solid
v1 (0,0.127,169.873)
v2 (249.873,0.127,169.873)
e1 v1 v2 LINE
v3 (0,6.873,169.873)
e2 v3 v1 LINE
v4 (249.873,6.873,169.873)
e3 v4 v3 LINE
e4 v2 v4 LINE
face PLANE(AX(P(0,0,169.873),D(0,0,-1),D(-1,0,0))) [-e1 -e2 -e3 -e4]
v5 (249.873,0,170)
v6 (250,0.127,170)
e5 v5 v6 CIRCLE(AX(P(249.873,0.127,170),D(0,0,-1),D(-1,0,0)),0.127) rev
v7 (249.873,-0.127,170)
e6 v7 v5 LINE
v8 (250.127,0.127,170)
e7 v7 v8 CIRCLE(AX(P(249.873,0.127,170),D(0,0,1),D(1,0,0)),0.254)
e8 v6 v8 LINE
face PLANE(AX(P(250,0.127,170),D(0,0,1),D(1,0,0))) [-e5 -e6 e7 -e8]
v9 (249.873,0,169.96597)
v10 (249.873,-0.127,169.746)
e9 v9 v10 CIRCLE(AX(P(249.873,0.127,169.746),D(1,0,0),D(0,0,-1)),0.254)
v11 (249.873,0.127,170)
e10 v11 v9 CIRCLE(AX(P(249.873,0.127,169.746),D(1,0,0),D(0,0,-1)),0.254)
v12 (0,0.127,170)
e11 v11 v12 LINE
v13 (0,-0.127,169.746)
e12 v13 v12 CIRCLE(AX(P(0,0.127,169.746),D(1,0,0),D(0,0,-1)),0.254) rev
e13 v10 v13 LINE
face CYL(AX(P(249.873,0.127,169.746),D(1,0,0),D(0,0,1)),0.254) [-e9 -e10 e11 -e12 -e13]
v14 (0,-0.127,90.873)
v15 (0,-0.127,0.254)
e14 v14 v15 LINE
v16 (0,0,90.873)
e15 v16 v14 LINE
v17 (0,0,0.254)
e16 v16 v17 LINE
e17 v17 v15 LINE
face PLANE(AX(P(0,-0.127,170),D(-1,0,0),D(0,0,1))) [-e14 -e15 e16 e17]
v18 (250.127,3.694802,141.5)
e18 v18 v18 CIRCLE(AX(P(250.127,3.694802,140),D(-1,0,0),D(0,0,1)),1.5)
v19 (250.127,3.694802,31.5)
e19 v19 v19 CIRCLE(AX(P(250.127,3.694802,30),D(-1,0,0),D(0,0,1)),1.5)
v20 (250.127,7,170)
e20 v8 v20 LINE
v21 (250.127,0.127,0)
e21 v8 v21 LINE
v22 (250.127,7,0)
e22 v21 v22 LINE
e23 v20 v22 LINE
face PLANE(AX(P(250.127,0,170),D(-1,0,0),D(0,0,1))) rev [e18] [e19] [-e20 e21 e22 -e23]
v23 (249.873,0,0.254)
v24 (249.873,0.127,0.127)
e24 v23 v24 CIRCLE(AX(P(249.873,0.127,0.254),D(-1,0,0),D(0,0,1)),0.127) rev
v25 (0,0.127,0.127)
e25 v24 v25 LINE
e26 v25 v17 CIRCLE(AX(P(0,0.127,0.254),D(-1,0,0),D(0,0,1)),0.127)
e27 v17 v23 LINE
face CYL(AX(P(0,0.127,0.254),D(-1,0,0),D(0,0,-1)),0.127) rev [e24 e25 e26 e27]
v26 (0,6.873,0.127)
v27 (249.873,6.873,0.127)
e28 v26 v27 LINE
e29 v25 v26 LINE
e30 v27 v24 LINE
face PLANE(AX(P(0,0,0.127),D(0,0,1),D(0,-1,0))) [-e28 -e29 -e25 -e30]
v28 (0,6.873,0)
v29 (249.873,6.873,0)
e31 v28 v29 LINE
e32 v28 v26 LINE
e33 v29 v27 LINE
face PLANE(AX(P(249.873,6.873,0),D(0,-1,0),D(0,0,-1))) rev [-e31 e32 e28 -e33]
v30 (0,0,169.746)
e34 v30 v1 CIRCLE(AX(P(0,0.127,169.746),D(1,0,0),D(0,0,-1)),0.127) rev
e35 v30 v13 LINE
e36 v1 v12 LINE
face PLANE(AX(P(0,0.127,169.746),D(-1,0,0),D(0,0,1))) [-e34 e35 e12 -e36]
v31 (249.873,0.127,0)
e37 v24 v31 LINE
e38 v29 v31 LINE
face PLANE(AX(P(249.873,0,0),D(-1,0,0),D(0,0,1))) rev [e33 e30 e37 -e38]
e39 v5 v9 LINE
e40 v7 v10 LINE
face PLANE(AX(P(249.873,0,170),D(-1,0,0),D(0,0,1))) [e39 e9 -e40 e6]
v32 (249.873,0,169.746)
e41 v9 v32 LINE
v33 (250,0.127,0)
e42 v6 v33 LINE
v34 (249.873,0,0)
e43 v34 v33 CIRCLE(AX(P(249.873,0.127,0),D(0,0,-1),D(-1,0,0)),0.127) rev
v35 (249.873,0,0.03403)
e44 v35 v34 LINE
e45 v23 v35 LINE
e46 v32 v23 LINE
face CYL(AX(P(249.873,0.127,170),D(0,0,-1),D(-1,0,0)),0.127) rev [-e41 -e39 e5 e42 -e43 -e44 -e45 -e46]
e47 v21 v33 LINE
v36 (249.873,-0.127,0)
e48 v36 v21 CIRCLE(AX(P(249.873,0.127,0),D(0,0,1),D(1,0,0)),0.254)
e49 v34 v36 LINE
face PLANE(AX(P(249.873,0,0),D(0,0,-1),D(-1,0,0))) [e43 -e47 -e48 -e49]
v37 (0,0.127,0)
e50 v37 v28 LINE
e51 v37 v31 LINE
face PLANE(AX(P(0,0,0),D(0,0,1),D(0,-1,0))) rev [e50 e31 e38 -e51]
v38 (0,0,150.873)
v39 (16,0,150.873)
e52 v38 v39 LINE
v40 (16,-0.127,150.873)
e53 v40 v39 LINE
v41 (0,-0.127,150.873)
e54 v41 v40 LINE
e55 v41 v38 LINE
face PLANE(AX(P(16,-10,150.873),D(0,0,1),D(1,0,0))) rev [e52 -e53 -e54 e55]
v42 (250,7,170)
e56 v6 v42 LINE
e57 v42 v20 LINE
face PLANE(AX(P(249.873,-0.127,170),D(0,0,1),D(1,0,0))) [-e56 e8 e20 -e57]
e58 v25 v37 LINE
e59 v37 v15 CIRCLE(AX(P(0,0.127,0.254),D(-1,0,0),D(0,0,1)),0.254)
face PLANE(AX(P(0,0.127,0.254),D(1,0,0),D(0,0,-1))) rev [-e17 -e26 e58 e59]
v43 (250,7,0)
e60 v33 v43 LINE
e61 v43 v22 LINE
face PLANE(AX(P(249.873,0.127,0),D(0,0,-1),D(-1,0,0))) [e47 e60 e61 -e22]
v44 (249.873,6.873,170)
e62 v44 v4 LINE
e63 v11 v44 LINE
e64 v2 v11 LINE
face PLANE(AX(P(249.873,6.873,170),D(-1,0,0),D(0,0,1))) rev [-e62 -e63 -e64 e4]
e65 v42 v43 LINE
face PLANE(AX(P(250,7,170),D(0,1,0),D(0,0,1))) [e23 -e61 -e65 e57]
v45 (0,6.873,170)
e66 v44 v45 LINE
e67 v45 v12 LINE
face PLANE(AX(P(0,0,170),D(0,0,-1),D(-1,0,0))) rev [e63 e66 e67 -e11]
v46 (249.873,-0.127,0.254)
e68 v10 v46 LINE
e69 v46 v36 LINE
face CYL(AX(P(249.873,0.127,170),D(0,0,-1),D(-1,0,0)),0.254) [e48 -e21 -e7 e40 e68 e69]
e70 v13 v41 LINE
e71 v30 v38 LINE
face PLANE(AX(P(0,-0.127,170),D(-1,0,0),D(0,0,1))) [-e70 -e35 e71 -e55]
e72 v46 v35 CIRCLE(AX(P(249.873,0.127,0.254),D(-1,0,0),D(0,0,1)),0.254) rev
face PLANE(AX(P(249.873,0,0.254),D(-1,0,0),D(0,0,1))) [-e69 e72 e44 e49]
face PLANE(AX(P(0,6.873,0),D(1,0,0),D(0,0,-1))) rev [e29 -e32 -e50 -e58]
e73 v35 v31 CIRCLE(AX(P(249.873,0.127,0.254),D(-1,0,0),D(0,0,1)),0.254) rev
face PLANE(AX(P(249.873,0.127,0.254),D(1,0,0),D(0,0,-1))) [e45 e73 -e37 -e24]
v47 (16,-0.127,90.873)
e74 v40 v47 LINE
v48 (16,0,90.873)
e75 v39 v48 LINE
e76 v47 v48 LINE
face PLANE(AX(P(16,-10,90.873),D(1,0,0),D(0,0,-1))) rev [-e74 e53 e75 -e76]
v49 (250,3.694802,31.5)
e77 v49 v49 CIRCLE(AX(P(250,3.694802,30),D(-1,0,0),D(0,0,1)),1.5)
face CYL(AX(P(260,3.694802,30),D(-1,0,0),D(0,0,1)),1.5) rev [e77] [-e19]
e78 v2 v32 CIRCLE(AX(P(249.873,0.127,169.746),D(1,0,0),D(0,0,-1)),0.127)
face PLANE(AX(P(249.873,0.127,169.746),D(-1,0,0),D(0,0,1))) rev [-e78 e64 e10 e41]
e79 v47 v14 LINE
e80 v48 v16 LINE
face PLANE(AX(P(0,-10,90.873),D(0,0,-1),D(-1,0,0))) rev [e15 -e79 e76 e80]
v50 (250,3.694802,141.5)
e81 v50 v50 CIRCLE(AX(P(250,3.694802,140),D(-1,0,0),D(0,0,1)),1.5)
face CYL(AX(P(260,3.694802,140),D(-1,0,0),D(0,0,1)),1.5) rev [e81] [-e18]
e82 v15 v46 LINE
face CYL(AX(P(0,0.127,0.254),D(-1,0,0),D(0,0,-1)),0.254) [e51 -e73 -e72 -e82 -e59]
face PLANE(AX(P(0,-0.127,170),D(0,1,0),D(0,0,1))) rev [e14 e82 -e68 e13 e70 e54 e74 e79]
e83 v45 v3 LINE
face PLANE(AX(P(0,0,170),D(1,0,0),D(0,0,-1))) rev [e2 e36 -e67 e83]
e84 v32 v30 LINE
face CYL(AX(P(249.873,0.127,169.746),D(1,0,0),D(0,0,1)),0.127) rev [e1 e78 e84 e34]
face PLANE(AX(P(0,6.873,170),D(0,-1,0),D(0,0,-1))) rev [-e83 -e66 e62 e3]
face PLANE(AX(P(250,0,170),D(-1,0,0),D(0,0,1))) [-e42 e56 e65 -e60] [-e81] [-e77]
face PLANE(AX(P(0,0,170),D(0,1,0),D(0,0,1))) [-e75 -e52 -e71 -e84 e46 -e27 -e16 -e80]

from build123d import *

# Parameters (mm, degrees)
BASE_FLANGE1_DEPTH             = 170
EDGE_FLANGE1_STRIP_W           = 0.762
EDGE_FLANGE1_STRIP_H           = 0.127
EDGE_FLANGE1_STRIP_CUT_DEPTH   = 249.873
EDGE_FLANGE1_STRIP_2_W         = 0.762
EDGE_FLANGE1_STRIP_2_H         = 0.127
EDGE_FLANGE1_STRIP_CUT_2_DEPTH = 249.873
EDGE_FLANGE1_DEPTH             = 249.873
EDGE_FLANGE1_BEND_DEPTH        = 249.873
SKETCH19_W                     = 16
SKETCH19_H                     = 60
CUT_EXTRUDE1_DEPTH             = 10
SKETCH20_R                     = 1.5
CUT_EXTRUDE2_DEPTH             = 10


# Sheet-metal steps are written as plain solids
with BuildPart() as part:
    # Sketch1 → Base-Flange1 (new body)
    with BuildSketch(Plane.XY):
        with BuildLine():
            Line((0, 0), (249.873, 0))
            ThreePointArc((249.873, 0), (249.962802561, 0.037197439), (250, 0.127))
            Line((250, 0.127), (250, 7))
            Line((250, 7), (250.127, 7))
            Line((250.127, 7), (250.127, 0.127))
            ThreePointArc((250.127, 0.127), (250.052605122, -0.052605122), (249.873, -0.127))
            Line((249.873, -0.127), (0, -0.127))
            Line((0, -0.127), (0, 0))
        make_face()
    extrude(amount=BASE_FLANGE1_DEPTH)

    # Edge-Flange1 strip (across the edge) → Edge-Flange1 strip cut (cut)
    with BuildSketch(Plane.ZY.offset(-249.873)):
        with Locations((-0.127, -0.0635)):
            Rectangle(EDGE_FLANGE1_STRIP_W, EDGE_FLANGE1_STRIP_H)
    extrude(amount=EDGE_FLANGE1_STRIP_CUT_DEPTH, mode=Mode.SUBTRACT)

    # Edge-Flange1 strip 2 (across the edge) → Edge-Flange1 strip cut 2 (cut)
    with BuildSketch(Plane(origin=(0, 0, 170), x_dir=(0, 0, -1), z_dir=(1, 0, 0))):
        with Locations((-0.127, -0.0635)):
            Rectangle(EDGE_FLANGE1_STRIP_2_W, EDGE_FLANGE1_STRIP_2_H)
    extrude(amount=EDGE_FLANGE1_STRIP_CUT_2_DEPTH, mode=Mode.SUBTRACT)

    # Edge-Flange1 section (across the edge) → Edge-Flange1 (add)
    with BuildSketch(Plane.ZY.offset(-249.873)):
        with BuildLine():
            Line((0, 0.127), (0, 6.873))
            Line((0, 6.873), (0.127, 6.873))
            Line((0.127, 6.873), (0.127, 0.127))
            ThreePointArc((0.127, 0.127), (0.164197439, 0.037197439), (0.254, 0))
            Line((0.254, 0), (0.254, -0.127))
            ThreePointArc((0.254, -0.127), (0.074394878, -0.052605122), (0, 0.127))
        make_face()
    extrude(amount=EDGE_FLANGE1_DEPTH)

    # Edge-Flange1 section 2 (across the edge) → Edge-Flange1 bend (add)
    with BuildSketch(Plane(origin=(0, 0, 170), x_dir=(0, 0, -1), z_dir=(1, 0, 0))):
        with BuildLine():
            Line((0, 0.127), (0, 6.873))
            Line((0, 6.873), (0.127, 6.873))
            Line((0.127, 6.873), (0.127, 0.127))
            ThreePointArc((0.127, 0.127), (0.164197439, 0.037197439), (0.254, 0))
            Line((0.254, 0), (0.254, -0.127))
            ThreePointArc((0.254, -0.127), (0.074394878, -0.052605122), (0, 0.127))
        make_face()
    extrude(amount=EDGE_FLANGE1_BEND_DEPTH)

    # Sketch19 → Cut-Extrude1 (cut)
    with BuildSketch(Plane(origin=(0, 0, 0), x_dir=(1, 0, 0), z_dir=(0, 1, 0))):
        with Locations((8, -120.873)):
            Rectangle(SKETCH19_W, SKETCH19_H)
    extrude(amount=-CUT_EXTRUDE1_DEPTH, mode=Mode.SUBTRACT)

    # Sketch20 → Cut-Extrude2 (cut)
    with BuildSketch(Plane.ZY.offset(-250)):
        with Locations((30, 3.694801823)):
            Circle(SKETCH20_R)
        with Locations((140, 3.694801823)):
            Circle(SKETCH20_R)
    extrude(amount=-CUT_EXTRUDE2_DEPTH, mode=Mode.SUBTRACT)


solid = part.part
